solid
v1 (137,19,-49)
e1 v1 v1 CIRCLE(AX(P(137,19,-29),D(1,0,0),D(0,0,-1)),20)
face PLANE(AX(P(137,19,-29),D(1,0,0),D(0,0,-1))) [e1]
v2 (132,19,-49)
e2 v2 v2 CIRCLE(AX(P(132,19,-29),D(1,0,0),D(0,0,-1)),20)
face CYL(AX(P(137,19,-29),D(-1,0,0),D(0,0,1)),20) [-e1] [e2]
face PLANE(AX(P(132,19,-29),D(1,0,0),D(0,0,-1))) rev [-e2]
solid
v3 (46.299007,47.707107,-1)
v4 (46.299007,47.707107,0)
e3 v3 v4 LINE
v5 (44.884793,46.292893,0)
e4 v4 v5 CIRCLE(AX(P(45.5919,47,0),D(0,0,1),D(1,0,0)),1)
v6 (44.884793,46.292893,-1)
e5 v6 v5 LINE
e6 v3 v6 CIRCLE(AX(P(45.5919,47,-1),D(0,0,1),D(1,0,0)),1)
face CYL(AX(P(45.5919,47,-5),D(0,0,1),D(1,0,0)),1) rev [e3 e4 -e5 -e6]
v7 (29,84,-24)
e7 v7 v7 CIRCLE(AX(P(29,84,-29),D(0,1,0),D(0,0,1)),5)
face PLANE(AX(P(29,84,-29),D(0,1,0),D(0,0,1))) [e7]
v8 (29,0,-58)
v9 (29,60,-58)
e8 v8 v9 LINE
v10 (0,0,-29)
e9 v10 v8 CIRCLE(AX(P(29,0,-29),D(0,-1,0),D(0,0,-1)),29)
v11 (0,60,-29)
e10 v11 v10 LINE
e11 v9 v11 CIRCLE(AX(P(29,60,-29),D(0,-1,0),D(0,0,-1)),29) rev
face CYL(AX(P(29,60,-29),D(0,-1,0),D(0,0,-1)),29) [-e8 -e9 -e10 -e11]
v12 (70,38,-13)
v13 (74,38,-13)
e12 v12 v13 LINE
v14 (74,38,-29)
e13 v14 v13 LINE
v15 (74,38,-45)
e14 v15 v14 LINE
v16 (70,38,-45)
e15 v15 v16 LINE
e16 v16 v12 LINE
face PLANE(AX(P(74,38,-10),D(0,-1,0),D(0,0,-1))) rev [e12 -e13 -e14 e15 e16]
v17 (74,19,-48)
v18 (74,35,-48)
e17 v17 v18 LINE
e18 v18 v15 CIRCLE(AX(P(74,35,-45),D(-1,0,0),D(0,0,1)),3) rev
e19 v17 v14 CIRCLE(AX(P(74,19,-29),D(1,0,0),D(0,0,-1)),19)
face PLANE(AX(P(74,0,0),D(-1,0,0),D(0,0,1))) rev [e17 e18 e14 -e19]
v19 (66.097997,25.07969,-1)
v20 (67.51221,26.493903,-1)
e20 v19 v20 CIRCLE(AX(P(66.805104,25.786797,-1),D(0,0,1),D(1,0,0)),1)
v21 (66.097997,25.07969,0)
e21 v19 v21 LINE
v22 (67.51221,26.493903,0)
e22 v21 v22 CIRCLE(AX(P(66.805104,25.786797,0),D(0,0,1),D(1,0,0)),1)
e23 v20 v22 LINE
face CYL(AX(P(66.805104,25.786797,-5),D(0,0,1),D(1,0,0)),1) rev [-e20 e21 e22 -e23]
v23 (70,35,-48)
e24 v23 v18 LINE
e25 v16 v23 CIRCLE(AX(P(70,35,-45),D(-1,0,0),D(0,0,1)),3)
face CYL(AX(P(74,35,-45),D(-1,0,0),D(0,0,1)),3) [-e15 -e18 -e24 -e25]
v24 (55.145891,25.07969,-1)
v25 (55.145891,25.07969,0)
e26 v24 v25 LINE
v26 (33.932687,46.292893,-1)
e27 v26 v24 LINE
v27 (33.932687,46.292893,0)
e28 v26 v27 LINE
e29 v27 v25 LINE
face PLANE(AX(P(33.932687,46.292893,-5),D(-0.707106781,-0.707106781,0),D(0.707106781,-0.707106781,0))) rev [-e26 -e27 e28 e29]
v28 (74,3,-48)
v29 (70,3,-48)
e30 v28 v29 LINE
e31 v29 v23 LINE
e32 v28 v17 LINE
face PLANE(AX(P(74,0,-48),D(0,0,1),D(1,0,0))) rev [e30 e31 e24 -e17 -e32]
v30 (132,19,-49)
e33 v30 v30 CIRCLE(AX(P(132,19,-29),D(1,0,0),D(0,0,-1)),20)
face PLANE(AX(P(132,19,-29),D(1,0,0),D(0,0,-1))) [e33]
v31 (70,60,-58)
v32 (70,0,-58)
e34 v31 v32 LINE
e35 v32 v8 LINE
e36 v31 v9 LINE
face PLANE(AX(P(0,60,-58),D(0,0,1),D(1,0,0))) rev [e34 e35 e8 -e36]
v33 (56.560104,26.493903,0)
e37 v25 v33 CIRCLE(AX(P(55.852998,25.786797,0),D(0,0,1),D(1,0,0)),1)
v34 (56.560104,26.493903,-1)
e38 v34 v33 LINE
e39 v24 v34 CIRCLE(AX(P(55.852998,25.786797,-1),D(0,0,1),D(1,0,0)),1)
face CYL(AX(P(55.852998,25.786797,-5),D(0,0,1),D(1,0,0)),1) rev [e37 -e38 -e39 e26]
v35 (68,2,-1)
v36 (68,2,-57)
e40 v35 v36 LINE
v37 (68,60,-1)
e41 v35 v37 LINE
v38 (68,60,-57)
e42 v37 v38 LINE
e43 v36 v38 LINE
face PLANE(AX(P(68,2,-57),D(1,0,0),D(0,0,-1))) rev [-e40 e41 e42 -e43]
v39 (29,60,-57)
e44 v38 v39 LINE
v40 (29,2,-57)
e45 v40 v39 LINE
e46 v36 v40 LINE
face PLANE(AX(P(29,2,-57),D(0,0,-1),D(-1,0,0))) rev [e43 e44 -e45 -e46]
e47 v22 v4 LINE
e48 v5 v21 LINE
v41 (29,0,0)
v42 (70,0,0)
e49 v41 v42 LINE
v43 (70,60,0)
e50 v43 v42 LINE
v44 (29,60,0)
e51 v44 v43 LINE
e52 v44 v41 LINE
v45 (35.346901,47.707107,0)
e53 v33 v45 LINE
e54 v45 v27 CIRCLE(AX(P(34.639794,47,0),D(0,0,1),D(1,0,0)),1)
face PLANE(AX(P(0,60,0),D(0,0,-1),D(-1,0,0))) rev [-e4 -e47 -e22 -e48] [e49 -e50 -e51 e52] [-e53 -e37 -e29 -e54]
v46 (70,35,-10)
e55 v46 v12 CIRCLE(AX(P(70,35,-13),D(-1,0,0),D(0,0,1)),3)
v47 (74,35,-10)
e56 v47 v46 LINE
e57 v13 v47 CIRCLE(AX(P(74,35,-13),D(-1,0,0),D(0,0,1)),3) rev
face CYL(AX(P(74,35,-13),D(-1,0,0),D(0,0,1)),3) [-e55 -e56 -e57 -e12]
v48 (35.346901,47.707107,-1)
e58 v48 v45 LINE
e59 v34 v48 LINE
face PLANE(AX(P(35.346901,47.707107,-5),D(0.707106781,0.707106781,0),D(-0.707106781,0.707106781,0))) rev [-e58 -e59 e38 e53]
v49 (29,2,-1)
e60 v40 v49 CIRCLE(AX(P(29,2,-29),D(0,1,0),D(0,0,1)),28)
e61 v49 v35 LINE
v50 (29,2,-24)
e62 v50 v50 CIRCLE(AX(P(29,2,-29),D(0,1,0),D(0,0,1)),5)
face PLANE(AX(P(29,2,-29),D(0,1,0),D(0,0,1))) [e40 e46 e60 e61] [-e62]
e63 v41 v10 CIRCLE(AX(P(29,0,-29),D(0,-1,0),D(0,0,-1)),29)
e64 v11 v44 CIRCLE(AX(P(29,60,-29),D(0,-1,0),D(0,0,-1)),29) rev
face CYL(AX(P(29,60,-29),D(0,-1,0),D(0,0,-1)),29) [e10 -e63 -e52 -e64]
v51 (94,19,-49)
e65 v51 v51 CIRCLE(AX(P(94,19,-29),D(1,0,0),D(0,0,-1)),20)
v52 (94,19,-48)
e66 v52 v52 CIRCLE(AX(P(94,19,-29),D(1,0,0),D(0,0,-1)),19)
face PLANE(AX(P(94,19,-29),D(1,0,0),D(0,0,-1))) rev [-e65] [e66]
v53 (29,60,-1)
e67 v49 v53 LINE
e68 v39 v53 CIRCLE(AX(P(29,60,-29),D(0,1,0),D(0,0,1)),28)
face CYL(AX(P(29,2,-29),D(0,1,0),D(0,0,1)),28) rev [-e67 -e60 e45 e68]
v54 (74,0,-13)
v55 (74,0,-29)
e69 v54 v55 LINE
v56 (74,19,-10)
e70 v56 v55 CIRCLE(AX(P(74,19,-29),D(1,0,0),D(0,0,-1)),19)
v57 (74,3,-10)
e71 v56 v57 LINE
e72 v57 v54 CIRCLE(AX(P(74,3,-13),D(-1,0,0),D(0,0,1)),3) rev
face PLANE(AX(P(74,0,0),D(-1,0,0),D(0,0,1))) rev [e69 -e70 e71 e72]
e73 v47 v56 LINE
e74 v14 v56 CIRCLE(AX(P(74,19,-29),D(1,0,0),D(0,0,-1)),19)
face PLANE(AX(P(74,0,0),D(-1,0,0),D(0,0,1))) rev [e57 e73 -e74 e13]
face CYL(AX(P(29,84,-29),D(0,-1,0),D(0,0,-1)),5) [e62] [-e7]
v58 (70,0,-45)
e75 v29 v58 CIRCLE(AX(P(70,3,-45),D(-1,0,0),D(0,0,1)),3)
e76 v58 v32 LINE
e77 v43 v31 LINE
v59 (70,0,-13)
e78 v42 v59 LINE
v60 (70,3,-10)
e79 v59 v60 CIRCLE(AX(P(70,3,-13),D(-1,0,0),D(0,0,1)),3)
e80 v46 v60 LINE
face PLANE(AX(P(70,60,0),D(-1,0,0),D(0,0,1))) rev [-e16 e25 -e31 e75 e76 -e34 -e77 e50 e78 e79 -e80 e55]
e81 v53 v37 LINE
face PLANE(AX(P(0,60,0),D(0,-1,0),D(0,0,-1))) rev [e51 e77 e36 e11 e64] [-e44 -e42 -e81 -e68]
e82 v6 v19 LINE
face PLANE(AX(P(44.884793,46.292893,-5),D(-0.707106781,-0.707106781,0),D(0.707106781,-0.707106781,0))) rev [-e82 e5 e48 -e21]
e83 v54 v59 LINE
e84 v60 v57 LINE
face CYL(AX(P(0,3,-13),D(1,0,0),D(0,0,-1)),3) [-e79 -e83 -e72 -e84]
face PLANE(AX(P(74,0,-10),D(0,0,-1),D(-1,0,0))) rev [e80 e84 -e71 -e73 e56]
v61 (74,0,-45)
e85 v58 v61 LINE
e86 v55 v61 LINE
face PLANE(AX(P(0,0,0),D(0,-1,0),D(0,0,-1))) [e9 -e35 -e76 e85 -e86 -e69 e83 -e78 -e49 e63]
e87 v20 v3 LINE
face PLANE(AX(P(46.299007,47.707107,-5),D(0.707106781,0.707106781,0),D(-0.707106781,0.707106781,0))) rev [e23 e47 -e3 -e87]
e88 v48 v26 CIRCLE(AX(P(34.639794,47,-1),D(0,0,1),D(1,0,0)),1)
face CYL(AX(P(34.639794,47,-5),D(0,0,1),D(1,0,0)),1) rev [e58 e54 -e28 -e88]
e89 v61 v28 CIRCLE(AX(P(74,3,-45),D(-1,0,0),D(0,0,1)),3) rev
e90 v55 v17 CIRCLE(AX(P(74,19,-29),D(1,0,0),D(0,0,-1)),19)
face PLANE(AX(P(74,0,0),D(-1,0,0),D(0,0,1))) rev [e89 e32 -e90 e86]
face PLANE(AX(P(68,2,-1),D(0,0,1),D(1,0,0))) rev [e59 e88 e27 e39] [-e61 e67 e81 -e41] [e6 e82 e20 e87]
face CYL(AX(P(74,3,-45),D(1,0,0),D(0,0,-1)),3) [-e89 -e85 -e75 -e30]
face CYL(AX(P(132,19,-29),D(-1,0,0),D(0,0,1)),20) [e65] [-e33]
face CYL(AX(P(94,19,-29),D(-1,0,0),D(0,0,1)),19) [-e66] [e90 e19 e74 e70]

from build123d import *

# Parameters (mm, degrees)
SKETCH1_W            = 70
SKETCH1_H            = 58
BOSS_EXTRUDE1_DEPTH  = 60
FILLET2_R            = 29
CUT_EXTRUDE1_DEPTH   = 58
SKETCH3_W            = 38
SKETCH3_H            = 38
BOSS_EXTRUDE6_DEPTH  = 4
FILLET4_R            = 3
SKETCH7_R            = 19
BOSS_EXTRUDE7_DEPTH  = 20
SKETCH8_R            = 20
BOSS_EXTRUDE8_DEPTH  = 38
SKETCH9_R            = 20
BOSS_EXTRUDE9_DEPTH  = 5
CUT_EXTRUDE2_DEPTH   = 5
SKETCH11_R           = 5
BOSS_EXTRUDE10_DEPTH = 82


with BuildPart() as part:
    # Sketch1 → Boss-Extrude1 (new body)
    with BuildSketch(Plane(origin=(0, 0, 0), x_dir=(1, 0, 0), z_dir=(0, 1, 0))):
        with Locations((35, 29)):
            Rectangle(SKETCH1_W, SKETCH1_H)
    extrude(amount=BOSS_EXTRUDE1_DEPTH)

    # Fillet2
    fillet2_edges = [part.edges().sort_by_distance(p)[0] for p in [
        (0, 30, 0),
        (0, 30, -58),
    ]]
    fillet(fillet2_edges, radius=FILLET2_R - 0.0001)  # a hair under: the kernel refuses the full size

    # Sketch2 → Cut-Extrude1 (cut)
    with BuildSketch(Plane(origin=(0, 60, 0), x_dir=(1, 0, 0), z_dir=(0, 1, 0))):
        with BuildLine():
            Line((29, 57), (68, 57))
            Line((68, 57), (68, 1))
            Line((68, 1), (29, 1))
            ThreePointArc((29, 1), (1, 29), (29, 57))
        make_face()
    extrude(amount=-CUT_EXTRUDE1_DEPTH, mode=Mode.SUBTRACT)

    # Sketch3 → Boss-Extrude6 (add)
    with BuildSketch(Plane(origin=(70, 0, 0), x_dir=(0, 0, -1), z_dir=(1, 0, 0))):
        with Locations((29, 19)):
            Rectangle(SKETCH3_W, SKETCH3_H)
    extrude(amount=BOSS_EXTRUDE6_DEPTH)

    # Fillet4
    fillet4_edges = [part.edges().sort_by_distance(p)[0] for p in [
        (72, 38, -10),
        (72, 0, -10),
        (72, 0, -48),
        (72, 38, -48),
    ]]
    fillet(fillet4_edges, radius=FILLET4_R)

    # Sketch7 → Boss-Extrude7 (add)
    with BuildSketch(Plane(origin=(74, 0, 0), x_dir=(0, 0, -1), z_dir=(1, 0, 0))):
        with Locations((29, 19)):
            Circle(SKETCH7_R)
    extrude(amount=BOSS_EXTRUDE7_DEPTH)

    # Sketch8 → Boss-Extrude8 (add)
    with BuildSketch(Plane(origin=(94, 0, 0), x_dir=(0, 0, -1), z_dir=(1, 0, 0))):
        with Locations((29, 19)):
            Circle(SKETCH8_R)
    extrude(amount=BOSS_EXTRUDE8_DEPTH)

    # Sketch10 → Cut-Extrude2 (cut)
    with BuildSketch(Plane.XY):
        with BuildLine():
            Line((35.346901033, 47.707106781), (56.560104469, 26.493903346))
            ThreePointArc((56.560104469, 26.493903346), (56.560104469, 25.079689783), (55.145890906, 25.079689783))
            Line((55.145890906, 25.079689783), (33.932687471, 46.292893219))
            ThreePointArc((33.932687471, 46.292893219), (33.932687471, 47.707106781), (35.346901033, 47.707106781))
        make_face()
        with BuildLine():
            Line((46.299007, 47.707106781), (67.512210435, 26.493903346))
            ThreePointArc((67.512210435, 26.493903346), (67.512210435, 25.079689783), (66.097996873, 25.079689783))
            Line((66.097996873, 25.079689783), (44.884793437, 46.292893219))
            ThreePointArc((44.884793437, 46.292893219), (44.884793437, 47.707106781), (46.299007, 47.707106781))
        make_face()
    extrude(amount=-CUT_EXTRUDE2_DEPTH, mode=Mode.SUBTRACT)

    # Sketch11 → Boss-Extrude10 (add)
    with BuildSketch(Plane(origin=(0, 2, 0), x_dir=(1, 0, 0), z_dir=(0, 1, 0))):
        with Locations(Location((29, 29, 0), (0, 0, 270))):
            Circle(SKETCH11_R)
    extrude(amount=BOSS_EXTRUDE10_DEPTH)


with BuildPart() as body_2:
    # Sketch9 → Boss-Extrude9 (new body)
    with BuildSketch(Plane(origin=(132, 0, 0), x_dir=(0, 0, -1), z_dir=(1, 0, 0))):
        with Locations((29, 19)):
            Circle(SKETCH9_R)
    extrude(amount=BOSS_EXTRUDE9_DEPTH)


solid = Compound([part.part, body_2.part])
